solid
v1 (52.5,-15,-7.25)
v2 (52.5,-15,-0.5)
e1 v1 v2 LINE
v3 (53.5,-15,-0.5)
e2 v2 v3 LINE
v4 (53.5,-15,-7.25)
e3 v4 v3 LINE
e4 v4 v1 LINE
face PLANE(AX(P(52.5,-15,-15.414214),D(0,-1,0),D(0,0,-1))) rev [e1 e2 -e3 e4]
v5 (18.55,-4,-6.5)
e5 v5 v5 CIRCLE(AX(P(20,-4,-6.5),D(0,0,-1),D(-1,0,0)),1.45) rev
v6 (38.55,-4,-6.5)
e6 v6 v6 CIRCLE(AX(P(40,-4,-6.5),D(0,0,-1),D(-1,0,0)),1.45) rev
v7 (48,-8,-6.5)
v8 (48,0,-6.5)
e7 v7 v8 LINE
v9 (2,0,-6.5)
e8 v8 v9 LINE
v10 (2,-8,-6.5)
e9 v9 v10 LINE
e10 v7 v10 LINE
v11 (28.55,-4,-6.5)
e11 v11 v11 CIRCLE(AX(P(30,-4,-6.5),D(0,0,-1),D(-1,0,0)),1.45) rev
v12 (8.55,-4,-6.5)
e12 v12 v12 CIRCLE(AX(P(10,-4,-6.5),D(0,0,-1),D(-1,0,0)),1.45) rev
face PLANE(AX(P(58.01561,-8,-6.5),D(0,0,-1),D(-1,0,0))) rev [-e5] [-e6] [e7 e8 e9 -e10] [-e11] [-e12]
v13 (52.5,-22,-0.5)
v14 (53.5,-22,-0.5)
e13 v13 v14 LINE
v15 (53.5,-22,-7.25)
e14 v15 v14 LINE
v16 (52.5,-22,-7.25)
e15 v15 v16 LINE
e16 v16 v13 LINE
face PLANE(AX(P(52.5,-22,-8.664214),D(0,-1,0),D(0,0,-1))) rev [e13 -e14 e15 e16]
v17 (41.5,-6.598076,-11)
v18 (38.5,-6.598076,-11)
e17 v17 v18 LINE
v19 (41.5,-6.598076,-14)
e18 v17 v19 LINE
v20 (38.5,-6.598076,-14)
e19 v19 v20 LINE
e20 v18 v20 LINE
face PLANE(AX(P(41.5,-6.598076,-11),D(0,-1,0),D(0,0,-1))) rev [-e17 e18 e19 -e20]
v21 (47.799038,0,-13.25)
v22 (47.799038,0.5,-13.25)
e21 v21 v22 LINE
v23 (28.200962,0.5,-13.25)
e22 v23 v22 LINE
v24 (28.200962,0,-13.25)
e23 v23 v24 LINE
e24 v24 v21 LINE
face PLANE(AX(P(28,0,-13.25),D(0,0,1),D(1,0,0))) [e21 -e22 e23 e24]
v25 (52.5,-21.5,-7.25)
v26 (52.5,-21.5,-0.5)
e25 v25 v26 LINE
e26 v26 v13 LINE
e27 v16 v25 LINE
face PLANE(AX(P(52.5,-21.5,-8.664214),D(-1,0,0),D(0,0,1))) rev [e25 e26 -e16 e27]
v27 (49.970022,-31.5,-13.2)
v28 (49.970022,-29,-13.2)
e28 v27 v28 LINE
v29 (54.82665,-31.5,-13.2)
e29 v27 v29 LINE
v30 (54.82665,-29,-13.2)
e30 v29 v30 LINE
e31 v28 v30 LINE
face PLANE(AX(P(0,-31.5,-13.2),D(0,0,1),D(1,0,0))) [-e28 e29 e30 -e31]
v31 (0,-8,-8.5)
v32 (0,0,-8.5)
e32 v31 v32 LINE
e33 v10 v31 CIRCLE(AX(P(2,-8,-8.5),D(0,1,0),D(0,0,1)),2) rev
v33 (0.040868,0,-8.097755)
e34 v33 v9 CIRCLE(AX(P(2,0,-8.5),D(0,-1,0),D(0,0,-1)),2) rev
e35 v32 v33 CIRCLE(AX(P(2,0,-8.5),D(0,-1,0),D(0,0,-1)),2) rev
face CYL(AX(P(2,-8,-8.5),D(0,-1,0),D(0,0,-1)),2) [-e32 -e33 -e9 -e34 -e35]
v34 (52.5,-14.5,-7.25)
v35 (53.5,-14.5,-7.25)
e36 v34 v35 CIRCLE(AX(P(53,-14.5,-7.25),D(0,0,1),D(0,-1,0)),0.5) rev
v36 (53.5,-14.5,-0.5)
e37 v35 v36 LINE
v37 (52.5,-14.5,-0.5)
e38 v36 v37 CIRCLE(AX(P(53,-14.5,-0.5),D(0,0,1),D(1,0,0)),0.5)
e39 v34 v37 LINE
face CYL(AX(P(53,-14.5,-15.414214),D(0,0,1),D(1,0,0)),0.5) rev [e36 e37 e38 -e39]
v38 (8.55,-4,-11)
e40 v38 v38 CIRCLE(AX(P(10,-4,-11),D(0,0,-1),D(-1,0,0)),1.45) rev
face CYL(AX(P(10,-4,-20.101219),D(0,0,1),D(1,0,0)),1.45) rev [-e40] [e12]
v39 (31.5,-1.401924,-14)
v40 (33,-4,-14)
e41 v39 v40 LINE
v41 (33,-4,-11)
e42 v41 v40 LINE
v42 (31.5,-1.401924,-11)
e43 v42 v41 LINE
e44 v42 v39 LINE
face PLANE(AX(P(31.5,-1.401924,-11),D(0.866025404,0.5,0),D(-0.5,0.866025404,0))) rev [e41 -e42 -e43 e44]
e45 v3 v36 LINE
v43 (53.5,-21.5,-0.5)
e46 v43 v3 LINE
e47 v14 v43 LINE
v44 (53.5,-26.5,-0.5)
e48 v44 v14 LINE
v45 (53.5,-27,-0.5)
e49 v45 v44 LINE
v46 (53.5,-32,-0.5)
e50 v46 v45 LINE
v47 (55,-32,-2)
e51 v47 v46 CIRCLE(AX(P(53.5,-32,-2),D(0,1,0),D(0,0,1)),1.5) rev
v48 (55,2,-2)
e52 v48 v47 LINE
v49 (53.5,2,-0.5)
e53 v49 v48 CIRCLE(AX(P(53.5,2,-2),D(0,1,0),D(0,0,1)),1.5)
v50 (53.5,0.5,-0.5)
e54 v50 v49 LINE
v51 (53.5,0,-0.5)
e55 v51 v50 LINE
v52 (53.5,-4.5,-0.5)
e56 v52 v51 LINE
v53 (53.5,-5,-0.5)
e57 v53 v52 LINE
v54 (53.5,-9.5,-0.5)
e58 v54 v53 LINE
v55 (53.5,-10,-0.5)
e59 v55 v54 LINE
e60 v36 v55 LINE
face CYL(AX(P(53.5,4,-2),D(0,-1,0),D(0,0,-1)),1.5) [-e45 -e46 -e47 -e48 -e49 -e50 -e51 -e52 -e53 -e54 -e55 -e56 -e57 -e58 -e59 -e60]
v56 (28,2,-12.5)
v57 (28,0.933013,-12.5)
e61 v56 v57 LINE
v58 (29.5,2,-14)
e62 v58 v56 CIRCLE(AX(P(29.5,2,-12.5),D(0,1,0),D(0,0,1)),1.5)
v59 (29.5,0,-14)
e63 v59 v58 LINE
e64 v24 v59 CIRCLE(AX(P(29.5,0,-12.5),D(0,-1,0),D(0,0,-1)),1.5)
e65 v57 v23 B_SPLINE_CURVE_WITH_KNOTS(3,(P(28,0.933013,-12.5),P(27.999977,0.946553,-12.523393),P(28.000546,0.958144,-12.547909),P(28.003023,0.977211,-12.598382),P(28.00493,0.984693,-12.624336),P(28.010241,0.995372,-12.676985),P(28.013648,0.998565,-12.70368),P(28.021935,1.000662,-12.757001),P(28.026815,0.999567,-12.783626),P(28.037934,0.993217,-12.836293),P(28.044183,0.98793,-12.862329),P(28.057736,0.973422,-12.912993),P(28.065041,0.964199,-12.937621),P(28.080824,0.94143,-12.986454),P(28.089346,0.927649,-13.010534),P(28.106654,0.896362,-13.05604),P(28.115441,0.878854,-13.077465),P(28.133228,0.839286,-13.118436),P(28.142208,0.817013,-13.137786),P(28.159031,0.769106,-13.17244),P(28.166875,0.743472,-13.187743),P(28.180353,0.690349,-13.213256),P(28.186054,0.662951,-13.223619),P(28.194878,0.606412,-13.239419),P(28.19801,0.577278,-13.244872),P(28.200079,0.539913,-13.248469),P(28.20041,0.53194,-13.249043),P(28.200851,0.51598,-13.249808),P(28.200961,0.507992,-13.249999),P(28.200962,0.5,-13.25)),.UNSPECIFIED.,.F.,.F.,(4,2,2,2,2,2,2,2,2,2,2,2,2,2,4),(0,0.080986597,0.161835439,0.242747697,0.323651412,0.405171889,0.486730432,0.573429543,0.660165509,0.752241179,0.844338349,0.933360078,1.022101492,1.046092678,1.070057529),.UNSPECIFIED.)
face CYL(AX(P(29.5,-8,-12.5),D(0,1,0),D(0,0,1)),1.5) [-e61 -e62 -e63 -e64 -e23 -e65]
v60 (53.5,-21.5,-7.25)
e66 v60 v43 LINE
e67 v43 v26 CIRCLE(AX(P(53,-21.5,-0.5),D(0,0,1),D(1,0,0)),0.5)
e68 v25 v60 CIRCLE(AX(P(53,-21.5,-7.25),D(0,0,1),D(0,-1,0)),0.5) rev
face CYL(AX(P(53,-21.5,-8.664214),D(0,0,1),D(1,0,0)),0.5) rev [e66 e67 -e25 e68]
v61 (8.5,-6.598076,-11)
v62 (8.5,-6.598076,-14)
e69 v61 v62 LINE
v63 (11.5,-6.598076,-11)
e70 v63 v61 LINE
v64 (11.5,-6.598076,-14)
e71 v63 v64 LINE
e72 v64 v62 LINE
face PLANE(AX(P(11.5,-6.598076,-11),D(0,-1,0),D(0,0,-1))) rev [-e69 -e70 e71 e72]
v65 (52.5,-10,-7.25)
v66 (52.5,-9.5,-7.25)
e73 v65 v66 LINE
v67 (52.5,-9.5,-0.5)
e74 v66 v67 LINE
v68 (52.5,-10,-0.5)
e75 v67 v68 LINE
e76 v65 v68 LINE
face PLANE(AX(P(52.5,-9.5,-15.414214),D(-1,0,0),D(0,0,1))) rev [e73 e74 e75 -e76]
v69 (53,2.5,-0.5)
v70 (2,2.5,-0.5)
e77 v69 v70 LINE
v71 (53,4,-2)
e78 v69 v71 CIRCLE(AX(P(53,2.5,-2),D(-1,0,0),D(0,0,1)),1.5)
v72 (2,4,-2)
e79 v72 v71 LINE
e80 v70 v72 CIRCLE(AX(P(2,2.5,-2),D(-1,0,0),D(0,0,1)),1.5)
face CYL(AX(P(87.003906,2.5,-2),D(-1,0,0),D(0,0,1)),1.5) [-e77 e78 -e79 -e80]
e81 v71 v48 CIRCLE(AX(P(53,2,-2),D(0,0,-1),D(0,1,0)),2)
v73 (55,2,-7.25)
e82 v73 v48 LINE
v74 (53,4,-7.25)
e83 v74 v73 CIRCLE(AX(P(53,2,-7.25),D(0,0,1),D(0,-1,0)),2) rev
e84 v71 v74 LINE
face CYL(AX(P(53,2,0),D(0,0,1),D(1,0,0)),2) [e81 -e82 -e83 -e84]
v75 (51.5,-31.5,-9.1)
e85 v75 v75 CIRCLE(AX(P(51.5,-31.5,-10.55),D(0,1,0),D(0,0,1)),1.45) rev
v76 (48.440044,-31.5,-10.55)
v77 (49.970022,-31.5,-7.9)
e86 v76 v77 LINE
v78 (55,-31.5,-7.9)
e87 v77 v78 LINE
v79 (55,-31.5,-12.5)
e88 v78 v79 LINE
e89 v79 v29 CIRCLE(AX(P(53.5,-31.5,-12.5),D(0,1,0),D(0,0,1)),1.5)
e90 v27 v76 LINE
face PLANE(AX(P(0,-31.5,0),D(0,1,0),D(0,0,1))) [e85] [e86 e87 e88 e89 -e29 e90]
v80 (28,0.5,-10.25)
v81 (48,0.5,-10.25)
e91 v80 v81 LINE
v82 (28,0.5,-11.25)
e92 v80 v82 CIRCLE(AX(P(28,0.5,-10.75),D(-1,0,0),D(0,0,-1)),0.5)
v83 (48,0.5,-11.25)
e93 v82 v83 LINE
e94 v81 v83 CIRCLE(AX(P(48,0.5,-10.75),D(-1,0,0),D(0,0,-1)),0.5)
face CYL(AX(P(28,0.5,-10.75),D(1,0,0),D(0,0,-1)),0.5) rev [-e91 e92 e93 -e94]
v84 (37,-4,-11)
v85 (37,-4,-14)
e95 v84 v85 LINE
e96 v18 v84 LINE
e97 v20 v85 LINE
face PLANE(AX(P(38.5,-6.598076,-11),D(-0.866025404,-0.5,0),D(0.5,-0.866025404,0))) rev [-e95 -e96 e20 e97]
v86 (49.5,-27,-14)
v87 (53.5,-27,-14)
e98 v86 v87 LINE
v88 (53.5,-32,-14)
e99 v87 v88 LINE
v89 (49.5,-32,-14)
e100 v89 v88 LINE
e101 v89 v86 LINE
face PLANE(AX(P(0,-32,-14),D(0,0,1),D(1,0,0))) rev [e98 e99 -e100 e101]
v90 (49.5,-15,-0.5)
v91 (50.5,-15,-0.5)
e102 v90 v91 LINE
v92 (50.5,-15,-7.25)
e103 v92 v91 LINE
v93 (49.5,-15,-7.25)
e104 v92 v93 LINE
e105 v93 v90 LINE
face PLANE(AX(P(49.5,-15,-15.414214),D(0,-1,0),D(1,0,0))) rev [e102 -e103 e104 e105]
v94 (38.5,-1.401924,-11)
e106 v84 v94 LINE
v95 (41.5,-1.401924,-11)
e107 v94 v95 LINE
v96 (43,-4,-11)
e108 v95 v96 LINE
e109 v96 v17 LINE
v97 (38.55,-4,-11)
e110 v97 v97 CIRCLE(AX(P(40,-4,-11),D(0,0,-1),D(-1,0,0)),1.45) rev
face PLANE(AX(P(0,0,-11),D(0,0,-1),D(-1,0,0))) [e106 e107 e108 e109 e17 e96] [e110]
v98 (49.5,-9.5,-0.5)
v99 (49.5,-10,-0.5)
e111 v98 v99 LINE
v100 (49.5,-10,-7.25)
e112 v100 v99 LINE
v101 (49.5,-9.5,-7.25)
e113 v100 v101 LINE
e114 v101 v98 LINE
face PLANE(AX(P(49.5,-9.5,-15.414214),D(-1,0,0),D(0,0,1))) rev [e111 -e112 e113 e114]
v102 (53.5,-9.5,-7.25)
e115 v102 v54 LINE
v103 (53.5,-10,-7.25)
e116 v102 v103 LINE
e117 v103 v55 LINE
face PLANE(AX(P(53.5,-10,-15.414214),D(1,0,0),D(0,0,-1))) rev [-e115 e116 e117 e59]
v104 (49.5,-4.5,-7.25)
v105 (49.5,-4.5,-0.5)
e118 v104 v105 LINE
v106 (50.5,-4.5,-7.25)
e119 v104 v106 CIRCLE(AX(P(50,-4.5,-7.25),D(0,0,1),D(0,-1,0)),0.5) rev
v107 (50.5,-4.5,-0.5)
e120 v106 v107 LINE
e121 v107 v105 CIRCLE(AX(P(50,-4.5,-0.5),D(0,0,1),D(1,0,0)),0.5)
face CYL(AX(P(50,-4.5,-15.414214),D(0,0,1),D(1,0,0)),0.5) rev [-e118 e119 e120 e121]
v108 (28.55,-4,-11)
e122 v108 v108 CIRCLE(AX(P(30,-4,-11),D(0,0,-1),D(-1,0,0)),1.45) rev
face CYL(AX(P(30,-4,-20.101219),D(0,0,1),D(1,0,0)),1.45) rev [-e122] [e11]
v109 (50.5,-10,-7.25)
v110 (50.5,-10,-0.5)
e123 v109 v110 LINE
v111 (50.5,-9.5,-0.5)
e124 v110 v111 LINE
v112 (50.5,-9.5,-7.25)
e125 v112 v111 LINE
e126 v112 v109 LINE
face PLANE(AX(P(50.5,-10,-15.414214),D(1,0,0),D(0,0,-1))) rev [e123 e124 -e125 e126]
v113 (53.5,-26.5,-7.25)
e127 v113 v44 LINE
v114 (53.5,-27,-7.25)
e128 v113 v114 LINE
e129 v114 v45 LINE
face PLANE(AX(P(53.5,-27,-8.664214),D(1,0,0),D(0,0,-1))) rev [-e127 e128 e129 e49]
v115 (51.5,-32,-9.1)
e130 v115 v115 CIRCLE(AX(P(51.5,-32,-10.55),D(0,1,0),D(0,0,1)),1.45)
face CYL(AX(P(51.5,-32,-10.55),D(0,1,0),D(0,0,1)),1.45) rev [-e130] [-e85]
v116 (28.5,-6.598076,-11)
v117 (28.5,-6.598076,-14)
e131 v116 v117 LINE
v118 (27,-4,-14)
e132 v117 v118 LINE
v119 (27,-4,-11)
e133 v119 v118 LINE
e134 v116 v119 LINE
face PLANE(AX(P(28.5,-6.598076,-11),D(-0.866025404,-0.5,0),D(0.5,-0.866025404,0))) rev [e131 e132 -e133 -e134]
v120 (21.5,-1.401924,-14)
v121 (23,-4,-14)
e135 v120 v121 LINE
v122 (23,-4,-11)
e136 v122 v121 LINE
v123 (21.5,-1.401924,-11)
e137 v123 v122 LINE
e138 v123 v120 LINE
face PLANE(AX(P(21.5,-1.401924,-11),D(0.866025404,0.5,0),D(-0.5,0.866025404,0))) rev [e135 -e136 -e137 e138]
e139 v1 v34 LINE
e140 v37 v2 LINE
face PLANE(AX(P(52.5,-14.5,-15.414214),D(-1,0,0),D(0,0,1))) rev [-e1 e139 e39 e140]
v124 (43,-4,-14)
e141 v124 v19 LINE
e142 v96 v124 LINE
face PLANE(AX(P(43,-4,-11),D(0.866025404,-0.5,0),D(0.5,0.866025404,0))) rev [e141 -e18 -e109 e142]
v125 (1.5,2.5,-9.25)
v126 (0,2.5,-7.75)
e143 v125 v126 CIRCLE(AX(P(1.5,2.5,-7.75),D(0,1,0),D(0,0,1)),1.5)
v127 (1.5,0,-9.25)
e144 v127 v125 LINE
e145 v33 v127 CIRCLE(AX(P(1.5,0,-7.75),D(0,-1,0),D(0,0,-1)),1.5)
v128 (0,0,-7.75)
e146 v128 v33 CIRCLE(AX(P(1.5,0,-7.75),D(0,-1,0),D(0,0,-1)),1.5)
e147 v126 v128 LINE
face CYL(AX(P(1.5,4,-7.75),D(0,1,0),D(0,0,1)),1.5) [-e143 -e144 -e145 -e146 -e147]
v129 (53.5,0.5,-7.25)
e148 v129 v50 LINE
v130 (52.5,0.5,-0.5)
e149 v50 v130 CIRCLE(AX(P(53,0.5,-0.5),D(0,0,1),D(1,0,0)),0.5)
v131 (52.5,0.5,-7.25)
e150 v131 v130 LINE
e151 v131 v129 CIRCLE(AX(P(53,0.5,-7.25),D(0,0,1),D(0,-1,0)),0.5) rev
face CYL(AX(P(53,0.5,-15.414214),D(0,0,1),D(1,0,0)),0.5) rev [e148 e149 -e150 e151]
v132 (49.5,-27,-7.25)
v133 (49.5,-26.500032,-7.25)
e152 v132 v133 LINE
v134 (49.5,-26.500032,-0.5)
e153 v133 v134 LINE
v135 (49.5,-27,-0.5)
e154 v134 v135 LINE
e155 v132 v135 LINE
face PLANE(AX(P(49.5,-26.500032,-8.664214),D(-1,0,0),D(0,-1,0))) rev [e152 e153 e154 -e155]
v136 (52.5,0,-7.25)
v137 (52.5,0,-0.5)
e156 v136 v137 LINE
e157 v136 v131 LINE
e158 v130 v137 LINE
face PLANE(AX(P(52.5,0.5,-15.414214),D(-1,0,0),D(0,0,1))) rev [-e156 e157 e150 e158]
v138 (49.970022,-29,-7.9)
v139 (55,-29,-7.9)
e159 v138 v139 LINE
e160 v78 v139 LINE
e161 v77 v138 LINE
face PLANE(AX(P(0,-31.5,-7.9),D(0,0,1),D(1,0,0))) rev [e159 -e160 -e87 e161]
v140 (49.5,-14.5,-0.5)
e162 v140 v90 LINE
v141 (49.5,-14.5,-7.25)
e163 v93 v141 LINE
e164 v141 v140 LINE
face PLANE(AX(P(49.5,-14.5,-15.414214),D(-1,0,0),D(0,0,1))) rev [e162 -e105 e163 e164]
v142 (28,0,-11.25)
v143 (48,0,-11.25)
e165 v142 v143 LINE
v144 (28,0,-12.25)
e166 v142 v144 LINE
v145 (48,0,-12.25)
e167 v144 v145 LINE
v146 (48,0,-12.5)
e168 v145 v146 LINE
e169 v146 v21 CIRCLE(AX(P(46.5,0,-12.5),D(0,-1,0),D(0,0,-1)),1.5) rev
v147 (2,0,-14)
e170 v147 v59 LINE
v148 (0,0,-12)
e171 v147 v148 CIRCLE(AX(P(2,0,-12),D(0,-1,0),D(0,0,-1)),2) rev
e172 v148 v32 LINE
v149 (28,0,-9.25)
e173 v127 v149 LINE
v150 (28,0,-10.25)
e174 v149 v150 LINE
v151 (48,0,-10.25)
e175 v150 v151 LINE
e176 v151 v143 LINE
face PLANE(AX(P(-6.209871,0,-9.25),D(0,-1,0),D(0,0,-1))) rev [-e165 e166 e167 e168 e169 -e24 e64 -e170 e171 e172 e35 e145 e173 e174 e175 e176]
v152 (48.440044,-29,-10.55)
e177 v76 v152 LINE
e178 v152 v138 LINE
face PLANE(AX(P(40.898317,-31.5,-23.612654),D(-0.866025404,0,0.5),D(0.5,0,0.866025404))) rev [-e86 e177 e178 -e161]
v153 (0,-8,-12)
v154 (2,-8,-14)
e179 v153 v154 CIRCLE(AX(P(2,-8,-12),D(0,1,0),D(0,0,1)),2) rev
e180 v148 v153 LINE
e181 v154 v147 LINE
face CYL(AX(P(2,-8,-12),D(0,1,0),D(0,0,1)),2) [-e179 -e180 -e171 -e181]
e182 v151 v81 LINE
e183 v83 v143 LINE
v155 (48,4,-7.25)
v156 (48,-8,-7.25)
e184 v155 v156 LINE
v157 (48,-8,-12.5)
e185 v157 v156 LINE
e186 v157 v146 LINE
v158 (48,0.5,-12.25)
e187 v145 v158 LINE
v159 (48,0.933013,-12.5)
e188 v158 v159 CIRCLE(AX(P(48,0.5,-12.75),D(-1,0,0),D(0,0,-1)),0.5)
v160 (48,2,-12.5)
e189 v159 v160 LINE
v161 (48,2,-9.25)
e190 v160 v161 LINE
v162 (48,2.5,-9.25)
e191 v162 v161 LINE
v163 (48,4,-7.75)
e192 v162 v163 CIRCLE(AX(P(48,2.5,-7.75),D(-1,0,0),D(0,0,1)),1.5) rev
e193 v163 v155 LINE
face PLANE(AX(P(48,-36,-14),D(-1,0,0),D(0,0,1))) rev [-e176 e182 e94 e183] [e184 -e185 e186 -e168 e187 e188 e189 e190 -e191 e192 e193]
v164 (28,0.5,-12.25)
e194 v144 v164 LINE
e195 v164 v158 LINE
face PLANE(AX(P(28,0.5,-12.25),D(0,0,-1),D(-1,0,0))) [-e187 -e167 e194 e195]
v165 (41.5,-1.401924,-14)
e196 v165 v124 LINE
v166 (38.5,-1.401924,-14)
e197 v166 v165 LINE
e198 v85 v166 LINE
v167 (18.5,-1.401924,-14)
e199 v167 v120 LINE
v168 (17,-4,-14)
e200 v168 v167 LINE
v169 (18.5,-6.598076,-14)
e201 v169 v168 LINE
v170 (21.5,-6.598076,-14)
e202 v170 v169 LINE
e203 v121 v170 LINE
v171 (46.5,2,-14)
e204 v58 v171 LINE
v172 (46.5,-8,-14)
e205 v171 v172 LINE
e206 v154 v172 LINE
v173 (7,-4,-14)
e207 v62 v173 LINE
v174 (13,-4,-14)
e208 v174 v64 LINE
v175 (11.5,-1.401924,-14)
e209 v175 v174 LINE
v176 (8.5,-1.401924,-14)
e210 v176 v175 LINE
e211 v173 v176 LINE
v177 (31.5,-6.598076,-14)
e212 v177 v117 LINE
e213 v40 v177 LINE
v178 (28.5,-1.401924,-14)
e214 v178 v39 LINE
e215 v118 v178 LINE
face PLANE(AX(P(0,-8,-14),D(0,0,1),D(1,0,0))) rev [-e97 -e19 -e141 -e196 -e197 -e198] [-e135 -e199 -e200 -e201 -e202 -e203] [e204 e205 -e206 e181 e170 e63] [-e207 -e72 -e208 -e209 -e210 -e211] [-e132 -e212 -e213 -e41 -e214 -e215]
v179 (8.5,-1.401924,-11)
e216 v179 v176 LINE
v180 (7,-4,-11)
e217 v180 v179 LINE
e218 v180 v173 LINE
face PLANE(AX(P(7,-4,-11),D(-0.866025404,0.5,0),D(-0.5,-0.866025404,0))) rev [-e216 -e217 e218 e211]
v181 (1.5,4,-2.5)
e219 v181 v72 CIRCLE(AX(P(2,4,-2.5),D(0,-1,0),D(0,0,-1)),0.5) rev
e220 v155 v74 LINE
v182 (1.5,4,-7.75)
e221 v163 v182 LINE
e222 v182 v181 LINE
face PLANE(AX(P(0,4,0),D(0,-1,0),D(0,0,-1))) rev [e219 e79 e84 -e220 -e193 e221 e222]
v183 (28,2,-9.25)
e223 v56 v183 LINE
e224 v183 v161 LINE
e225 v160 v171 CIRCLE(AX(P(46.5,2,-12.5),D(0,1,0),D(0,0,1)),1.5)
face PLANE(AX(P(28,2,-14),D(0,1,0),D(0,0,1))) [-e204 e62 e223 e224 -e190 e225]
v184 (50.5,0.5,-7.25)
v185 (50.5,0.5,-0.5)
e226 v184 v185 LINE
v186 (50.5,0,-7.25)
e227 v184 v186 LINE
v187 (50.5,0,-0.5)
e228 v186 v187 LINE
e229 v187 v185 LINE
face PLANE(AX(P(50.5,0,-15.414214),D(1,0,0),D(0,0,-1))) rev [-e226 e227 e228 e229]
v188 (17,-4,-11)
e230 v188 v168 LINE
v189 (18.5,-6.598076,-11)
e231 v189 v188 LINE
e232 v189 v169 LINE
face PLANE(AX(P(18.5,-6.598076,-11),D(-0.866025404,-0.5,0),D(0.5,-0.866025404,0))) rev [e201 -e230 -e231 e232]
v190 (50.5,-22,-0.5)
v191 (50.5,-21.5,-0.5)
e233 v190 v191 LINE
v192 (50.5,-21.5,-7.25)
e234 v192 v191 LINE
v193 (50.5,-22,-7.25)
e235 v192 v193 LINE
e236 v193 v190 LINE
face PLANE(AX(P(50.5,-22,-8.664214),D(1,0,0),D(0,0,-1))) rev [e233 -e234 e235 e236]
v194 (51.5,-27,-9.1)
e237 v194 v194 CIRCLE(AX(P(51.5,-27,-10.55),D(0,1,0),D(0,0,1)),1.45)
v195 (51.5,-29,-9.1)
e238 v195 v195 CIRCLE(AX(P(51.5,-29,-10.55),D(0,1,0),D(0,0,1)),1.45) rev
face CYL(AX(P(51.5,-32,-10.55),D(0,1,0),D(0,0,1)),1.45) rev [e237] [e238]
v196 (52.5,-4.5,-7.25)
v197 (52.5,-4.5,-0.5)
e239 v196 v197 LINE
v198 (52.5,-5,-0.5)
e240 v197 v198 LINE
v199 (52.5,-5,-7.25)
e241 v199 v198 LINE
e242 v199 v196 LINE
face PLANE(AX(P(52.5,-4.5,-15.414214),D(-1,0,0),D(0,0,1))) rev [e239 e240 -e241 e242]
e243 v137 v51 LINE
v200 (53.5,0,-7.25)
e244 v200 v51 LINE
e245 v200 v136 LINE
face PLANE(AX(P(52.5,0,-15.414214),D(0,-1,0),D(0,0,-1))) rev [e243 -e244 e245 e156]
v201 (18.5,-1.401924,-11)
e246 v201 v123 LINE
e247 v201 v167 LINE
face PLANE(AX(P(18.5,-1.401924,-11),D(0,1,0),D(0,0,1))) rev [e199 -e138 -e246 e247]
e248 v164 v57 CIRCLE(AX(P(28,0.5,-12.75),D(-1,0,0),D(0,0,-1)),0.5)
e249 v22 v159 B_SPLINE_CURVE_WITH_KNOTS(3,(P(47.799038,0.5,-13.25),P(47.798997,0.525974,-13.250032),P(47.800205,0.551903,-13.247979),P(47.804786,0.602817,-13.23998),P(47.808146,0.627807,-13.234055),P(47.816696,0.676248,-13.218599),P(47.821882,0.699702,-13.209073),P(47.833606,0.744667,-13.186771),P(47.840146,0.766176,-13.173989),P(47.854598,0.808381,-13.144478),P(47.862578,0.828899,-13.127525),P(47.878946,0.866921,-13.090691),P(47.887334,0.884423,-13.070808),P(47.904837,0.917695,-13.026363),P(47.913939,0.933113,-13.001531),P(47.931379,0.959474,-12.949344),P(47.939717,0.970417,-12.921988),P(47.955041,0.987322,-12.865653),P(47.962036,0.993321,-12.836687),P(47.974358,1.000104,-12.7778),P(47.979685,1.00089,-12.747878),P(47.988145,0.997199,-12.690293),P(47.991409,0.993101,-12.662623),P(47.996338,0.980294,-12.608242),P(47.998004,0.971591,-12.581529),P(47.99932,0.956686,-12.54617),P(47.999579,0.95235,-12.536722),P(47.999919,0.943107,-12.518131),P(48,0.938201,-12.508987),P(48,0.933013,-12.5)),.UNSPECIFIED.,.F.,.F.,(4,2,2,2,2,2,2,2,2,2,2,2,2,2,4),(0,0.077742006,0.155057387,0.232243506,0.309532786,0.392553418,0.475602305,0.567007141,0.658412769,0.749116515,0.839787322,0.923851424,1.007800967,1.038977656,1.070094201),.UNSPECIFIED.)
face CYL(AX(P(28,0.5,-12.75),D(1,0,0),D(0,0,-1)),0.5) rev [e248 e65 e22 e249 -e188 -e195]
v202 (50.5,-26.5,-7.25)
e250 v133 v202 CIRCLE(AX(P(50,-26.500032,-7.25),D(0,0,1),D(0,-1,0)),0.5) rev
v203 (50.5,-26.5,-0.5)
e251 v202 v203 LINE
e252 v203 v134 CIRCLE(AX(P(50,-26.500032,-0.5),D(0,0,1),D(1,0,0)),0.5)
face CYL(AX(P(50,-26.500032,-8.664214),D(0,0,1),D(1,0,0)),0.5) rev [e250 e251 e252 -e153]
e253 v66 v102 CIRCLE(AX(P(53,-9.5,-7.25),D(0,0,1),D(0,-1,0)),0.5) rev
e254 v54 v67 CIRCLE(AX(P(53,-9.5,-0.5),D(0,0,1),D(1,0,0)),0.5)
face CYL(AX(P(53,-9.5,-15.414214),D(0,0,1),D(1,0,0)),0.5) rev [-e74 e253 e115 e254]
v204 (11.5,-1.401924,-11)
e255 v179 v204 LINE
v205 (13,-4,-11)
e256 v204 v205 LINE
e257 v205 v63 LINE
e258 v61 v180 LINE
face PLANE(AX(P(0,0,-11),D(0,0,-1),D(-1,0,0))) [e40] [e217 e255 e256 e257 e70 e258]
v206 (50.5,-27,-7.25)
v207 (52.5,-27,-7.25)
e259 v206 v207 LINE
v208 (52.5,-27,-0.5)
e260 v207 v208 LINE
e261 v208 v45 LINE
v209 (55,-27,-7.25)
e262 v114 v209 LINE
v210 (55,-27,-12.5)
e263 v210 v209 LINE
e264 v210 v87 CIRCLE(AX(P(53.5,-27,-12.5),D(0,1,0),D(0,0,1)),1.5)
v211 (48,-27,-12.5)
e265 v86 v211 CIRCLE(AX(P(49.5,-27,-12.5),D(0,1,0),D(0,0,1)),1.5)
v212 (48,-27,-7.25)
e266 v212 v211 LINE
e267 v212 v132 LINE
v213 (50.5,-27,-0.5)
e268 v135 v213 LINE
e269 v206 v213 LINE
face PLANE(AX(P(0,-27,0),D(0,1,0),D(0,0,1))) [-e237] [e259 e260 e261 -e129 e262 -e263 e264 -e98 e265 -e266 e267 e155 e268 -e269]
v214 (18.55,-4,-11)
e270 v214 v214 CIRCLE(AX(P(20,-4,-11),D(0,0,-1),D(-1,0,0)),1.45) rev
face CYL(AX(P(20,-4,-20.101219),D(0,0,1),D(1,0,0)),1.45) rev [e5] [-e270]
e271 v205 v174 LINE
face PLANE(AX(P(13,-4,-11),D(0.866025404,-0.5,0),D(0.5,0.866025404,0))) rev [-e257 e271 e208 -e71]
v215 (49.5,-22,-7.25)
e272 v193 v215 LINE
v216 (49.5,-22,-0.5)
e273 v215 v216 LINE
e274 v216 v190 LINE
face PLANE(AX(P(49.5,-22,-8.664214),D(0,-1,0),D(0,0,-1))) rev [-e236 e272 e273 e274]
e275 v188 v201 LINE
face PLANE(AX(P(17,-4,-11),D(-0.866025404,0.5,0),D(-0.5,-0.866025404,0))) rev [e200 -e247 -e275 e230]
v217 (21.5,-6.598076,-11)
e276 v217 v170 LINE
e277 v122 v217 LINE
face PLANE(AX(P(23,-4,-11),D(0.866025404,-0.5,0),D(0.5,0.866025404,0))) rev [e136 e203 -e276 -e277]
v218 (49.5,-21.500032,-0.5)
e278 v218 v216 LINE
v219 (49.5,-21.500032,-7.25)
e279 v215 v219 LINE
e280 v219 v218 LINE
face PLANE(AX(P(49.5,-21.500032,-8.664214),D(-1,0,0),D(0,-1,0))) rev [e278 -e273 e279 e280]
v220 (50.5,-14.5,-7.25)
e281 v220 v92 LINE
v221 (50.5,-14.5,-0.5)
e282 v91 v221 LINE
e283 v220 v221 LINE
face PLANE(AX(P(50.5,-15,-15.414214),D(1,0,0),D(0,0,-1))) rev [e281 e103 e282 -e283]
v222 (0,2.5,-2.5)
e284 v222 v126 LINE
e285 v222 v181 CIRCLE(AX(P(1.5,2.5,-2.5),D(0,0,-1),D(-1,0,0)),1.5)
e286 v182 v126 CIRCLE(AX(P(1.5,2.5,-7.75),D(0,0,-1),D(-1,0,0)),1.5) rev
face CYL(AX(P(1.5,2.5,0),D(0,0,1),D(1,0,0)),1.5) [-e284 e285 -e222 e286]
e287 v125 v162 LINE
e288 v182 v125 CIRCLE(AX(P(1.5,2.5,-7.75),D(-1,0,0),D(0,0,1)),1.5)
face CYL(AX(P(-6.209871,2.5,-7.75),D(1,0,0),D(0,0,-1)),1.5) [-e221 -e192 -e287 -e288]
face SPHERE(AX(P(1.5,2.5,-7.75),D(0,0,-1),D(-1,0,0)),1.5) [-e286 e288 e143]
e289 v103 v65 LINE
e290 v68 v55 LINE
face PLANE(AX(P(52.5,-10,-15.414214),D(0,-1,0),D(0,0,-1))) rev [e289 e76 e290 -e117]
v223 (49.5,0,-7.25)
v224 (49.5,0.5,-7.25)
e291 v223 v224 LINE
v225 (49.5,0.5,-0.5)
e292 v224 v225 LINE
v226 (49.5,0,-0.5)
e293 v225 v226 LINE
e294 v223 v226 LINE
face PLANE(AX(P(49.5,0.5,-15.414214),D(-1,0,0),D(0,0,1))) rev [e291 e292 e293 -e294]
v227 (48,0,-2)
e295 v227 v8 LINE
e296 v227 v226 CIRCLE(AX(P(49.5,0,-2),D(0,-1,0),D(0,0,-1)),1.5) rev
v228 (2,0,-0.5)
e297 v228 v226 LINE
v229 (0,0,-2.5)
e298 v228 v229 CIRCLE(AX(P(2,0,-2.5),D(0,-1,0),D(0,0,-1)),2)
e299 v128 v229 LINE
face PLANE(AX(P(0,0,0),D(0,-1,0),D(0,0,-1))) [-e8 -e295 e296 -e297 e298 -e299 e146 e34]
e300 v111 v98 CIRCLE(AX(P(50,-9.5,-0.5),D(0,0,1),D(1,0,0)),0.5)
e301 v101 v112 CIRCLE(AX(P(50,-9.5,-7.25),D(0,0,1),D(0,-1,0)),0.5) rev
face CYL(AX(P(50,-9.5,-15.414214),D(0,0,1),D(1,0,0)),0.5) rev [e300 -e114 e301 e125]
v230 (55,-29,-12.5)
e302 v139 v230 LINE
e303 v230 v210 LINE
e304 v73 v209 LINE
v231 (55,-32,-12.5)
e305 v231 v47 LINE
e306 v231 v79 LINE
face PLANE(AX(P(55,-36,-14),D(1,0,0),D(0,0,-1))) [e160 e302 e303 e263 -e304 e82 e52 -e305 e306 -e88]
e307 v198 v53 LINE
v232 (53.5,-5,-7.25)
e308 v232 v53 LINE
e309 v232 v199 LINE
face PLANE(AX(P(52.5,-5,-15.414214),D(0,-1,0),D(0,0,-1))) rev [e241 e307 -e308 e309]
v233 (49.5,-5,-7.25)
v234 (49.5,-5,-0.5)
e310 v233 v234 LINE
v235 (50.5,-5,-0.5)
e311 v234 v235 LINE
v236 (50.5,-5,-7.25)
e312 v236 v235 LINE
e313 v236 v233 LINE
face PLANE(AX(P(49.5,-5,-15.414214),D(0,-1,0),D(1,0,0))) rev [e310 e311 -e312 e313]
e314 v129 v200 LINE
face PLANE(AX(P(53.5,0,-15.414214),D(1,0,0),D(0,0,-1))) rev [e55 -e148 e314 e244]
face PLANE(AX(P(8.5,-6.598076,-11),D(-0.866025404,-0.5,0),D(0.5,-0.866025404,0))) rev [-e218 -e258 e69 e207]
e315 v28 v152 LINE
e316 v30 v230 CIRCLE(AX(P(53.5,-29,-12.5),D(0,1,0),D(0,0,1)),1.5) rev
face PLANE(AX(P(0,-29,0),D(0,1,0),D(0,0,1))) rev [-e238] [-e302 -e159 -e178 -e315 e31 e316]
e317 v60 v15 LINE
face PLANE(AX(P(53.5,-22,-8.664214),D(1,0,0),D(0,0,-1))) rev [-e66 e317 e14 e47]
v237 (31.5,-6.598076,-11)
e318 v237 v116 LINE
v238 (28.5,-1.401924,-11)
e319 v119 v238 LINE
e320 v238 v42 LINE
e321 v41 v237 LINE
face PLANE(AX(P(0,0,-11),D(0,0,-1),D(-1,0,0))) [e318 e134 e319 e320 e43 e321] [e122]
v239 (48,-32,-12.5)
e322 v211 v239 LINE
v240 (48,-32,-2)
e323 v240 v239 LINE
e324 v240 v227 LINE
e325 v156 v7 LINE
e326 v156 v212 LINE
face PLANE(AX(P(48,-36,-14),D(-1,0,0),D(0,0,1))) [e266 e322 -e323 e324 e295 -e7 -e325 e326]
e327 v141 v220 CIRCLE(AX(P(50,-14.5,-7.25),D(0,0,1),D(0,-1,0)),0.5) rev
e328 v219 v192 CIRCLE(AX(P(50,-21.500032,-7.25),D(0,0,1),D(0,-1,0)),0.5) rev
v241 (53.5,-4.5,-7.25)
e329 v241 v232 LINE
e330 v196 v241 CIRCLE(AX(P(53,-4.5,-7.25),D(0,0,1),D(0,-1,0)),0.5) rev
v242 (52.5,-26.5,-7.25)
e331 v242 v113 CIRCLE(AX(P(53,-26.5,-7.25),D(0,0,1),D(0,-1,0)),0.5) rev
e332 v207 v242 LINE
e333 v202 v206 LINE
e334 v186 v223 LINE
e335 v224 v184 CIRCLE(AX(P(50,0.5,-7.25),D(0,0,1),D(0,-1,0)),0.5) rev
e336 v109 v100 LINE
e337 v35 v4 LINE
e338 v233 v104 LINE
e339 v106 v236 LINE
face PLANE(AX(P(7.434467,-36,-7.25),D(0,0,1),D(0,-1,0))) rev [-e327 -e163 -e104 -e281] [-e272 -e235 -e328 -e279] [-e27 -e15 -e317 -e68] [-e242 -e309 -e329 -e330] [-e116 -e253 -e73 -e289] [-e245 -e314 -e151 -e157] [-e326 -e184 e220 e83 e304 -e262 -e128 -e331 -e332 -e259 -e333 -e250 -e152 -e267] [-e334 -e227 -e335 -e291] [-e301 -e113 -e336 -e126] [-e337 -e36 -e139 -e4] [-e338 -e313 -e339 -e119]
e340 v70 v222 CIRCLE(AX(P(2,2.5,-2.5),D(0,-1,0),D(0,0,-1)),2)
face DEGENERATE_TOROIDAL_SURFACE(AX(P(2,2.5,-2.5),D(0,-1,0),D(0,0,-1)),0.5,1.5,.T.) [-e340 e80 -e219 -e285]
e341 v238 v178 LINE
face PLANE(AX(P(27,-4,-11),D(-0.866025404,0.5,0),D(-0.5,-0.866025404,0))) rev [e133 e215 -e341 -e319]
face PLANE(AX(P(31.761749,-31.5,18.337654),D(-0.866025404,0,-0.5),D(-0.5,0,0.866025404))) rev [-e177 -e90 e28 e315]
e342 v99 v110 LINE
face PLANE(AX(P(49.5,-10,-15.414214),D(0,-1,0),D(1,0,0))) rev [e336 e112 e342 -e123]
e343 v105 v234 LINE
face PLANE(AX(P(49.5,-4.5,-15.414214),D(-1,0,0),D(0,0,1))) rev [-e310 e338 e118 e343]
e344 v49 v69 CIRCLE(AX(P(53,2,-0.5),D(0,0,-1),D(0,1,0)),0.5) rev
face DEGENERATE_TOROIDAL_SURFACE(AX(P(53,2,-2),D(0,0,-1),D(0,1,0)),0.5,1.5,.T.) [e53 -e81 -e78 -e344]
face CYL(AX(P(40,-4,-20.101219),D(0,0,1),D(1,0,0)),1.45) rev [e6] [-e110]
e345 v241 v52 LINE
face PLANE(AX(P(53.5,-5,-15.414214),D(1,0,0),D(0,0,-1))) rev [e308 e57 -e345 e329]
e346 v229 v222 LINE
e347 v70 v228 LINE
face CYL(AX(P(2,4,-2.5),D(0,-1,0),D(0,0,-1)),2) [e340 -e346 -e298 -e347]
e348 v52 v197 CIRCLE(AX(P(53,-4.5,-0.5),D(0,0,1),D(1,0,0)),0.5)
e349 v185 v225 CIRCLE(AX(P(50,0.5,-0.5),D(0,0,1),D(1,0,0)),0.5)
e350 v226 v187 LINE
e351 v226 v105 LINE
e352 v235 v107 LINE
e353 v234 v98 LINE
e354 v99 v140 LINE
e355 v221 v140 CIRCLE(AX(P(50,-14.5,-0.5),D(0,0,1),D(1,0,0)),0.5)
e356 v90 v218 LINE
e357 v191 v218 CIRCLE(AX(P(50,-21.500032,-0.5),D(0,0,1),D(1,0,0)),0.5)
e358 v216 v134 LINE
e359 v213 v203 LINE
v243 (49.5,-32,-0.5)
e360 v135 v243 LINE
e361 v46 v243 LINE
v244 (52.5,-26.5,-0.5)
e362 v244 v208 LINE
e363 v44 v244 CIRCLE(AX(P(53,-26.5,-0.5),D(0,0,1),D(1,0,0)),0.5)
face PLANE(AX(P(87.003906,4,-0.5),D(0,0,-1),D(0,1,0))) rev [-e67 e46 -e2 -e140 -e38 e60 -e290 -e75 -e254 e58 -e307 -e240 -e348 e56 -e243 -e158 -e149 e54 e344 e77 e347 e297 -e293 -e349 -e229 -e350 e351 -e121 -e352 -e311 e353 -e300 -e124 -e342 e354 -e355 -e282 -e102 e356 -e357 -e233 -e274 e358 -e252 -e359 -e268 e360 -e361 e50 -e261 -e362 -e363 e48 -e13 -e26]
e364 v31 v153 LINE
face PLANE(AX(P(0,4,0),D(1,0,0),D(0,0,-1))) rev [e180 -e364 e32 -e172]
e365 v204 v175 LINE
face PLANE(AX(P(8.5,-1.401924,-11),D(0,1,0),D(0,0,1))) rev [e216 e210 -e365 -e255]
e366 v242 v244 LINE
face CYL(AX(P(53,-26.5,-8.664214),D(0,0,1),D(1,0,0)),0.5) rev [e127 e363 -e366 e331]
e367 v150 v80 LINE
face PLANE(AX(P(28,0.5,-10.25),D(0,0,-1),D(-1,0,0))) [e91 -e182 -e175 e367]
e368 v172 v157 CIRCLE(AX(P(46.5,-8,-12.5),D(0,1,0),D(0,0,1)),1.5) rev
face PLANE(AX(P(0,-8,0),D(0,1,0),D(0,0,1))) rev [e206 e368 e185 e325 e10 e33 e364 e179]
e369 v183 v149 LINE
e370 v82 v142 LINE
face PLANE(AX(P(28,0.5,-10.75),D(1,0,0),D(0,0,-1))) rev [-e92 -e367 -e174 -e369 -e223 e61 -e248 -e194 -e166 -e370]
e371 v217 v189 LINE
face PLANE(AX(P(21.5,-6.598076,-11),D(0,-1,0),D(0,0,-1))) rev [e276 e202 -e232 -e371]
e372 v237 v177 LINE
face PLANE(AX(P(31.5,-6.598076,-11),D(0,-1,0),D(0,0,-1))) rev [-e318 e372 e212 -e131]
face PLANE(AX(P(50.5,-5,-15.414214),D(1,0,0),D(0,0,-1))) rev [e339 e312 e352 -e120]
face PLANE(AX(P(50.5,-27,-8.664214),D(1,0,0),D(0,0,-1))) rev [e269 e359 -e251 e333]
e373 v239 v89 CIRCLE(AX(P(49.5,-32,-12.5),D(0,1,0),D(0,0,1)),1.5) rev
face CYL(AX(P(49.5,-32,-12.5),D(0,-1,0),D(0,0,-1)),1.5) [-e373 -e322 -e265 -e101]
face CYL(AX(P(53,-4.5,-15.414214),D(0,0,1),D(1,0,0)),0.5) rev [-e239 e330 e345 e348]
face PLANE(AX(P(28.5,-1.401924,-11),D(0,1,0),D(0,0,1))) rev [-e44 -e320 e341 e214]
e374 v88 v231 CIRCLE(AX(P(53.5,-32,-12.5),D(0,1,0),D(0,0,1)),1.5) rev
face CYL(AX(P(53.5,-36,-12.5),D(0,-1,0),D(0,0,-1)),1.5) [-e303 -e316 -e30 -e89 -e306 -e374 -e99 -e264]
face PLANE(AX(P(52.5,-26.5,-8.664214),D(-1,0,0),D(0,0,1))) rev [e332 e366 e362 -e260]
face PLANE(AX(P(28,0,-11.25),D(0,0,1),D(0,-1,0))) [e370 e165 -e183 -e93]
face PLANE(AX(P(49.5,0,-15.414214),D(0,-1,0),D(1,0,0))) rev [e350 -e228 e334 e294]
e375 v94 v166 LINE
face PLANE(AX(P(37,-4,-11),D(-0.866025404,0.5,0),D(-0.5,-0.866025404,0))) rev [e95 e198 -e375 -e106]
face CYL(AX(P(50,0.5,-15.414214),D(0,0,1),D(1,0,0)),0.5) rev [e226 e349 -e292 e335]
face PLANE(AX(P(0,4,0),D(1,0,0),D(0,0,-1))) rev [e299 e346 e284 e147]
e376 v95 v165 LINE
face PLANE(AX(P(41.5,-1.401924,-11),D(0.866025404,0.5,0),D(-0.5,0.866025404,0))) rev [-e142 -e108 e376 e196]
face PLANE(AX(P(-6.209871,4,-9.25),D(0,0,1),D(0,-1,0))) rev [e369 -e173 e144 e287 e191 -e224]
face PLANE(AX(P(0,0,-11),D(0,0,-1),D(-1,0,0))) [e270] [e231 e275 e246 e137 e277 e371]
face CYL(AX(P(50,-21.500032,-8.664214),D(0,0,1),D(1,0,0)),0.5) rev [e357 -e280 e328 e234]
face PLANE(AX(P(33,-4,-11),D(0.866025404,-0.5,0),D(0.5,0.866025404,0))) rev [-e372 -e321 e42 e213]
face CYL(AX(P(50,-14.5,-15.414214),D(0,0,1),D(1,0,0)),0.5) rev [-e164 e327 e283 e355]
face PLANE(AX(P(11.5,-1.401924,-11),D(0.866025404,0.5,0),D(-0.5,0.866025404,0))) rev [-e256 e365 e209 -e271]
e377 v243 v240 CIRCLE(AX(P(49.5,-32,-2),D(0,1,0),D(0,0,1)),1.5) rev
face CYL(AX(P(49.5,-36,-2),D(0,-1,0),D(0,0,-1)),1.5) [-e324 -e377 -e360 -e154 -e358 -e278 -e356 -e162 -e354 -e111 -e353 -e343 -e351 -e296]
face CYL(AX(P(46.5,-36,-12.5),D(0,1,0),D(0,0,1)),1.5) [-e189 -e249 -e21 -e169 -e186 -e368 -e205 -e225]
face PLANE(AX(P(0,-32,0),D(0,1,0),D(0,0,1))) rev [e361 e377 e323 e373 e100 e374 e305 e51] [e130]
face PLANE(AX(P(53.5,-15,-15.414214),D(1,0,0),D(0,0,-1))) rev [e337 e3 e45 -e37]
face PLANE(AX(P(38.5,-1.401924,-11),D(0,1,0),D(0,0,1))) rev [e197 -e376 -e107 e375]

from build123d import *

# Parameters (mm, degrees)
SKETCH1_W            = 55
SKETCH1_H            = 16
BOSS_EXTRUDE1_DEPTH  = 4
SKETCH2_W            = 50
SKETCH2_H            = 8
BOSS_EXTRUDE2_DEPTH  = 8
SKETCH3_W            = 5
SKETCH3_H            = 16
BOSS_EXTRUDE3_DEPTH  = 28
SKETCH4_R            = 1.45
CUT_EXTRUDE2_DEPTH   = 10
CUT_EXTRUDE4_START   = -3
CUT_EXTRUDE4_DEPTH   = 3
CUT_EXTRUDE5_DEPTH   = 5
SKETCH8_W            = 50
SKETCH8_H            = 2
CUT_EXTRUDE6_DEPTH   = 4
CUT_EXTRUDE7_START   = -50
SKETCH9_W            = 0.5
SKETCH9_H            = 8
CUT_EXTRUDE7_DEPTH   = 50
CUT_EXTRUDE8_START   = -55
SKETCH10_W           = 0.5
SKETCH10_H           = 32
CUT_EXTRUDE8_DEPTH   = 55
CUT_EXTRUDE9_DEPTH   = 3
CUT_EXTRUDE11_DEPTH  = 3
BOSS_EXTRUDE4_START  = 2
SKETCH17_W           = 15
SKETCH17_H           = 32
BOSS_EXTRUDE4_DEPTH  = 2
SKETCH18_W           = 7
SKETCH18_H           = 1.5
CUT_EXTRUDE12_DEPTH  = 32
FILLET1_R            = 2
SKETCH19_W           = 13.5
SKETCH19_H           = 32
CUT_EXTRUDE13_DEPTH  = 7
SKETCH20_W           = 7
SKETCH20_H           = 13.5
BOSS_EXTRUDE5_DEPTH  = 40
CUT_EXTRUDE14_DEPTH  = 13.5
FILLET2_R            = 2
CUT_EXTRUDE15_REACH  = 69.209
SKETCH22_W           = 6.75
SKETCH22_H           = 40
LPATTERN1_COUNT      = 4
LPATTERN1_PITCH      = 5
SKETCH23_W           = 4.75
SKETCH23_H           = 4
CUT_EXTRUDE16_DEPTH  = 48
BOSS_EXTRUDE9_START  = -27
SKETCH29_W           = 7
SKETCH29_H           = 6.75
SKETCH29_R           = 1.45
BOSS_EXTRUDE9_DEPTH  = 5
CUT_EXTRUDE19_START  = -2
CUT_EXTRUDE19_DEPTH  = 2.5
BOSS_EXTRUDE11_DEPTH = 20
SKETCH35_W           = 7
SKETCH35_H           = 4
CUT_EXTRUDE20_DEPTH  = 6.75
FILLET3_R            = 1.5
CUT_EXTRUDE21_DEPTH  = 6.75


# Read off the part's stored shape, not the designer's step: Cut-Extrude4
with BuildPart() as part:
    # Sketch1 → Boss-Extrude1 (new body)
    with BuildSketch(Plane(origin=(0, 0, 0), x_dir=(1, 0, 0), z_dir=(0, 1, 0))):
        with Locations((27.5, 8)):
            Rectangle(SKETCH1_W, SKETCH1_H)
    extrude(amount=BOSS_EXTRUDE1_DEPTH)

    # Sketch2 → Boss-Extrude2 (add)
    with BuildSketch(Plane.XZ):
        with Locations((25, -10)):
            Rectangle(SKETCH2_W, SKETCH2_H)
    extrude(amount=BOSS_EXTRUDE2_DEPTH)

    # Sketch3 → Boss-Extrude3 (add)
    with BuildSketch(Plane.XZ):
        with Locations((52.5, -8)):
            Rectangle(SKETCH3_W, SKETCH3_H)
    extrude(amount=BOSS_EXTRUDE3_DEPTH)

    # Sketch4 → Cut-Extrude2 (cut)
    with BuildSketch(Plane.XY.offset(-6)):
        with Locations((10, -4)):
            Circle(SKETCH4_R)
        with Locations((20, -4)):
            Circle(SKETCH4_R)
        with Locations((30, -4)):
            Circle(SKETCH4_R)
        with Locations((40, -4)):
            Circle(SKETCH4_R)
    extrude(amount=-CUT_EXTRUDE2_DEPTH, mode=Mode.SUBTRACT)

    # Cut-Extrude4 outline → Cut-Extrude4 (cut)
    with BuildSketch(Plane.ZY.offset(-50).offset(CUT_EXTRUDE4_START)):
        Polygon((-6.598076211, -25.5), (-4, -27), (-1.401923789, -25.5), (-1.401923789, 0), (-6, 0), (-6, -8), (-6.598076211, -8), align=None)
        Polygon((-7.401923789, -25.5), (-7.401923789, -8), (-12.598076211, -8), (-12.598076211, -25.5), (-10, -27), align=None)
    extrude(amount=CUT_EXTRUDE4_DEPTH, mode=Mode.SUBTRACT)

    # Sketch7 → Cut-Extrude5 (cut)
    with BuildSketch(Plane.ZY.offset(-50)):
        with BuildLine():
            Line((-11.45, -12), (-11.45, -24))
            ThreePointArc((-11.45, -24), (-10, -25.45), (-8.55, -24))
            Line((-8.55, -24), (-8.55, -12))
            ThreePointArc((-8.55, -12), (-10, -10.55), (-11.45, -12))
        make_face()
        with BuildLine():
            Line((-2.55, -12), (-2.55, -24))
            ThreePointArc((-2.55, -24), (-4, -25.45), (-5.45, -24))
            Line((-5.45, -24), (-5.45, -12))
            ThreePointArc((-5.45, -12), (-4, -10.55), (-2.55, -12))
        make_face()
    extrude(amount=-CUT_EXTRUDE5_DEPTH, mode=Mode.SUBTRACT)

    # Sketch8 → Cut-Extrude6 (cut)
    with BuildSketch(Plane(origin=(0, 4, 0), x_dir=(1, 0, 0), z_dir=(0, 1, 0))):
        with Locations((25, 15)):
            Rectangle(SKETCH8_W, SKETCH8_H)
    extrude(amount=-CUT_EXTRUDE6_DEPTH, mode=Mode.SUBTRACT)

    # Sketch9 → Cut-Extrude7 (cut)
    with BuildSketch(Plane.ZY.offset(CUT_EXTRUDE7_START)):
        with Locations((-6.25, -4)):
            Rectangle(SKETCH9_W, SKETCH9_H)
    extrude(amount=CUT_EXTRUDE7_DEPTH, mode=Mode.SUBTRACT)

    # Sketch10 → Cut-Extrude8 (cut)
    with BuildSketch(Plane.ZY.offset(CUT_EXTRUDE8_START)):
        with Locations((-0.25, -12)):
            Rectangle(SKETCH10_W, SKETCH10_H)
        with Locations((-15.75, -12)):
            Rectangle(SKETCH10_W, SKETCH10_H)
    extrude(amount=CUT_EXTRUDE8_DEPTH, mode=Mode.SUBTRACT)

    # Sketch11 → Cut-Extrude9 (cut)
    with BuildSketch(Plane(origin=(0, 0, -14), x_dir=(-1, 0, 0), z_dir=(0, 0, -1))):
        Polygon((-37, -4), (-38.5, -1.401923789), (-41.5, -1.401923789), (-43, -4), (-41.5, -6.598076211), (-38.5, -6.598076211), align=None)
        Polygon((-27, -4), (-28.5, -1.401923789), (-31.5, -1.401923789), (-33, -4), (-31.5, -6.598076211), (-28.5, -6.598076211), align=None)
        Polygon((-17, -4), (-18.5, -1.401923789), (-21.5, -1.401923789), (-23, -4), (-21.5, -6.598076211), (-18.5, -6.598076211), align=None)
        Polygon((-7, -4), (-8.5, -1.401923789), (-11.5, -1.401923789), (-13, -4), (-11.5, -6.598076211), (-8.5, -6.598076211), align=None)
    extrude(amount=-CUT_EXTRUDE9_DEPTH, mode=Mode.SUBTRACT)

    # Sketch15 → Cut-Extrude11 (cut)
    with BuildSketch(Plane.ZY.offset(-50)):
        Polygon((-4, -27), (-1.401923789, -25.5), (-1.401923789, 0.004821093), (-1.401923789, 4), (-6.598076211, 4), (-6.598076211, -8), (-6.598076211, -25.5), align=None)
        Polygon((-7.401923789, -25.5), (-7.401923789, -8), (-7.401923789, 4), (-12.598076211, 4), (-12.598076211, -8), (-12.598076211, -25.5), (-10, -27), align=None)
    extrude(amount=-CUT_EXTRUDE11_DEPTH, mode=Mode.SUBTRACT)

    # Sketch17 → Boss-Extrude4 (add)
    with BuildSketch(Plane.ZY.offset(-50).offset(BOSS_EXTRUDE4_START)):
        with Locations((-8, -12)):
            Rectangle(SKETCH17_W, SKETCH17_H)
        with BuildLine():
            Line((-11.45, -12), (-11.45, -24))
            ThreePointArc((-11.45, -24), (-10, -25.45), (-8.55, -24))
            Line((-8.55, -24), (-8.55, -12))
            ThreePointArc((-8.55, -12), (-10, -10.55), (-11.45, -12))
        make_face(mode=Mode.SUBTRACT)
        with BuildLine():
            Line((-5.45, -12), (-5.45, -24))
            ThreePointArc((-5.45, -24), (-4, -25.45), (-2.55, -24))
            Line((-2.55, -24), (-2.55, -12))
            ThreePointArc((-2.55, -12), (-4, -10.55), (-5.45, -12))
        make_face(mode=Mode.SUBTRACT)
    extrude(amount=-BOSS_EXTRUDE4_DEPTH)

    # Sketch18 → Cut-Extrude12 (cut)
    with BuildSketch(Plane(origin=(0, 4, 0), x_dir=(1, 0, 0), z_dir=(0, 1, 0))):
        with Locations((51.5, 14.75)):
            Rectangle(SKETCH18_W, SKETCH18_H)
    extrude(amount=-CUT_EXTRUDE12_DEPTH, mode=Mode.SUBTRACT)

    # Fillet1
    fillet1_edges = [part.edges().sort_by_distance(p)[0] for p in [
        (0, -2, -14),
        (0, -4, -6.5),
        (0, 2, -0.5),
        (55, -12, -0.5),
        (48, -14, -0.5),
        (55, -12, -14),
        (48, -18, -14),
    ]]
    fillet(fillet1_edges, radius=FILLET1_R)

    # Sketch19 → Cut-Extrude13 (cut)
    with BuildSketch(Plane(origin=(55, 0, 0), x_dir=(0, 0, -1), z_dir=(1, 0, 0))):
        with Locations((7.25, -12)):
            Rectangle(SKETCH19_W, SKETCH19_H)
    extrude(amount=-CUT_EXTRUDE13_DEPTH, mode=Mode.SUBTRACT)

    # Sketch20 → Boss-Extrude5 (add)
    with BuildSketch(Plane(origin=(0, 4, 0), x_dir=(1, 0, 0), z_dir=(0, 1, 0))):
        with Locations((51.5, 7.25)):
            Rectangle(SKETCH20_W, SKETCH20_H)
    extrude(amount=-BOSS_EXTRUDE5_DEPTH)

    # Sketch21 → Cut-Extrude14 (cut)
    with BuildSketch(Plane.XY.offset(-0.5)):
        with BuildLine():
            Line((52.5, 0.5), (52.5, 0))
            Line((52.5, 0), (53.5, 0))
            Line((53.5, 0), (53.5, 0.5))
            ThreePointArc((53.5, 0.5), (53.353553391, 0.853553391), (53, 1))
            ThreePointArc((53, 1), (52.646446609, 0.853553391), (52.5, 0.5))
        make_face()
        with BuildLine():
            Line((49.5, 0.5), (49.5, 0))
            Line((49.5, 0), (50.5, 0))
            Line((50.5, 0), (50.5, 0.5))
            ThreePointArc((50.5, 0.5), (50, 1), (49.5, 0.5))
        make_face()
    cut_extrude14 = extrude(amount=-CUT_EXTRUDE14_DEPTH, mode=Mode.SUBTRACT)

    # Fillet2
    fillet2_edges = [part.edges().sort_by_distance(p)[0] for p in [
        (48, -36, -7.25),
        (55, -36, -7.25),
        (55, 4, -7.25),
    ]]
    fillet(fillet2_edges, radius=FILLET2_R)

    # Cut-Extrude15: up to this face of the body (flat: up to its plane)
    cut_extrude15_end = Plane(part.part.faces().sort_by_distance((48, -18.954887218, -6.79887218))[0])
    # Sketch22 → Cut-Extrude15 (cut, up to the picked face)
    with BuildSketch(Plane(origin=(55, 0, 0), x_dir=(0, 0, -1), z_dir=(1, 0, 0)), mode=Mode.PRIVATE) as cut_extrude15_sk1:
        with Locations((10.625, -16)):
            Rectangle(SKETCH22_W, SKETCH22_H)
    cut_extrude15_tool1 = split(extrude(cut_extrude15_sk1.sketch, amount=-CUT_EXTRUDE15_REACH, mode=Mode.PRIVATE), bisect_by=cut_extrude15_end, keep=Keep.BOTH, mode=Mode.PRIVATE)
    add(cut_extrude15_tool1.solids().sort_by(Axis((55, -16, -10.625), (-1, 0, 0)))[0], mode=Mode.SUBTRACT)

    # LPattern1: Cut-Extrude14 ×4
    with Locations(*[(0, -i * LPATTERN1_PITCH, 0) for i in range(1, LPATTERN1_COUNT)]):
        add(cut_extrude14, mode=Mode.SUBTRACT)

    # Sketch23 → Cut-Extrude16 (cut)
    with BuildSketch(Plane(origin=(48, 0, 0), x_dir=(0, 0, -1), z_dir=(1, 0, 0))):
        with Locations((11.625, 2)):
            Rectangle(SKETCH23_W, SKETCH23_H)
    extrude(amount=-CUT_EXTRUDE16_DEPTH, mode=Mode.SUBTRACT)

    # Sketch29 → Boss-Extrude9 (add)
    with BuildSketch(Plane(origin=(0, 0, 0), x_dir=(1, 0, 0), z_dir=(0, 1, 0)).offset(BOSS_EXTRUDE9_START)):
        with Locations((51.5, 10.625)):
            Rectangle(SKETCH29_W, SKETCH29_H)
        with Locations(Location((51.5, 10.55, 0), (0, 0, 270))):
            Circle(SKETCH29_R, mode=Mode.SUBTRACT)
    extrude(amount=-BOSS_EXTRUDE9_DEPTH)

    # Sketch30 → Cut-Extrude19 (cut)
    with BuildSketch(Plane(origin=(0, -27, 0), x_dir=(1, 0, 0), z_dir=(0, 1, 0)).offset(CUT_EXTRUDE19_START)):
        Polygon((53.029978213, 13.2), (49.970021787, 13.2), (48.440043573, 10.55), (49.970021787, 7.9), (53.029978213, 7.9), (55, 7.9), (55, 13.2), align=None)
    extrude(amount=-CUT_EXTRUDE19_DEPTH, mode=Mode.SUBTRACT)

    # Sketch34 → Boss-Extrude11 (add)
    with BuildSketch(Plane(origin=(48, 0, 0), x_dir=(0, 0, -1), z_dir=(1, 0, 0))):
        with BuildLine():
            Line((14, 0), (13.25, 0))
            Line((13.25, 0), (13.25, 0.5))
            ThreePointArc((13.25, 0.5), (12.75, 1), (12.25, 0.5))
            Line((12.25, 0.5), (12.25, 0))
            Line((12.25, 0), (11.25, 0))
            Line((11.25, 0), (11.25, 0.5))
            ThreePointArc((11.25, 0.5), (10.75, 1), (10.25, 0.5))
            Line((10.25, 0.5), (10.25, 0))
            Line((10.25, 0), (9.25, 0))
            Line((9.25, 0), (9.25, 2))
            Line((9.25, 2), (14, 2))
            Line((14, 2), (14, 0))
        make_face()
    extrude(amount=-BOSS_EXTRUDE11_DEPTH)

    # Sketch35 → Cut-Extrude20 (cut)
    with BuildSketch(Plane.XY.offset(-0.5)):
        with Locations((51.5, -34)):
            Rectangle(SKETCH35_W, SKETCH35_H)
    extrude(amount=-CUT_EXTRUDE20_DEPTH, mode=Mode.SUBTRACT)

    # Fillet3
    # the kernel refuses this fillet: 1.5 mm, written as the material it takes off along each edge
    with BuildSketch(Plane(origin=(1.5, 2.5, -7.75), x_dir=(-1, 0, 0), z_dir=(0, 1, 0))) as fillet3_piece_1_section:
        Polygon((0, 0), (FILLET3_R, 0), (FILLET3_R, -FILLET3_R), (0, -FILLET3_R), align=None)
    fillet3_piece_1 = extrude(amount=FILLET3_R, mode=Mode.PRIVATE)
    fillet3_piece_1 = fillet3_piece_1 - Plane(origin=(1.5, 2.5, -7.75), x_dir=(0.7071067811865475, 0, 0.7071067811865475), z_dir=(0, 1, 0)) * Sphere(FILLET3_R, mode=Mode.PRIVATE)
    add(fillet3_piece_1, mode=Mode.SUBTRACT)
    with BuildSketch(Plane(origin=(0, 4, -7.75), x_dir=(1, 0, 0), z_dir=(0, 0, 1))) as fillet3_piece_2:
        with BuildLine():
            CenterArc((FILLET3_R, -FILLET3_R), FILLET3_R, 90, 90)
            Line((0, -FILLET3_R), (0, 0))
            Line((0, 0), (FILLET3_R, 0))
        make_face()
    extrude(amount=5.25, mode=Mode.SUBTRACT)
    with BuildSketch(Plane(origin=(2, 4, -2.5), x_dir=(-1, 0, 0), z_dir=(0, 0, -1))) as fillet3_piece_3:
        with BuildLine():
            CenterArc((2 - FILLET3_R, -FILLET3_R), FILLET3_R, 0, 90)
            Line((2, -FILLET3_R), (2, 0))
            Line((2, 0), (2 - FILLET3_R, 0))
        make_face()
    revolve(axis=Axis((2, 4, -2.5), (0, 1, 0)), revolution_arc=90, mode=Mode.SUBTRACT)
    with BuildSketch(Plane(origin=(2, 4, -0.5), x_dir=(0, 0, -1), z_dir=(1, 0, 0))) as fillet3_piece_4:
        with BuildLine():
            CenterArc((FILLET3_R, -FILLET3_R), FILLET3_R, 90, 90)
            Line((0, -FILLET3_R), (0, 0))
            Line((0, 0), (FILLET3_R, 0))
        make_face()
    extrude(amount=51, mode=Mode.SUBTRACT)
    with BuildSketch(Plane(origin=(53, 2, -0.5), x_dir=(0, 1, 0), z_dir=(-1, 0, 0))) as fillet3_piece_5:
        with BuildLine():
            CenterArc((2 - FILLET3_R, FILLET3_R), FILLET3_R, 270, 90)
            Line((2 - FILLET3_R, 0), (2, 0))
            Line((2, 0), (2, FILLET3_R))
        make_face()
    revolve(axis=Axis((53, 2, -0.5), (0, 0, -1)), revolution_arc=90, mode=Mode.SUBTRACT)
    with BuildSketch(Plane(origin=(28, 5.75, -14), x_dir=(1, 0, 0), z_dir=(0, -1, 0))) as fillet3_piece_6:
        with BuildLine():
            CenterArc((FILLET3_R, FILLET3_R), FILLET3_R, 180, 90)
            Line((0, FILLET3_R), (0, 0))
            Line((0, 0), (FILLET3_R, 0))
        make_face()
    extrude(amount=5.75, mode=Mode.SUBTRACT)
    with BuildSketch(Plane(origin=(48, -11.75, -14), x_dir=(-1, 0, 0), z_dir=(0, 1, 0))) as fillet3_piece_7:
        with BuildLine():
            CenterArc((FILLET3_R, FILLET3_R), FILLET3_R, 180, 90)
            Line((0, FILLET3_R), (0, 0))
            Line((0, 0), (FILLET3_R, 0))
        make_face()
    extrude(amount=17.5, mode=Mode.SUBTRACT)
    with BuildSketch(Plane(origin=(48, -23.25, -14), x_dir=(0, 0, 1), z_dir=(0, -1, 0))) as fillet3_piece_8:
        with BuildLine():
            CenterArc((FILLET3_R, -FILLET3_R), FILLET3_R, 90, 90)
            Line((0, -FILLET3_R), (0, 0))
            Line((0, 0), (FILLET3_R, 0))
        make_face()
    extrude(amount=12.5, mode=Mode.SUBTRACT)
    with BuildSketch(Plane(origin=(55, -23.25, -14), x_dir=(0, 0, 1), z_dir=(0, -1, 0))) as fillet3_piece_9:
        with BuildLine():
            CenterArc((FILLET3_R, FILLET3_R), FILLET3_R, 180, 90)
            Line((0, FILLET3_R), (0, 0))
            Line((0, 0), (FILLET3_R, 0))
        make_face()
    extrude(amount=12.5, mode=Mode.SUBTRACT)
    with BuildSketch(Plane(origin=(55, 2, -0.5), x_dir=(0, 0, -1), z_dir=(0, -1, 0))) as fillet3_piece_10:
        with BuildLine():
            CenterArc((FILLET3_R, -FILLET3_R), FILLET3_R, 90, 90)
            Line((0, -FILLET3_R), (0, 0))
            Line((0, 0), (FILLET3_R, 0))
        make_face()
    extrude(amount=37.75, mode=Mode.SUBTRACT)
    with BuildSketch(Plane(origin=(51.75, 4, -9.25), x_dir=(0, 0, 1), z_dir=(-1, 0, 0))) as fillet3_piece_11:
        with BuildLine():
            CenterArc((FILLET3_R, -FILLET3_R), FILLET3_R, 90, 90)
            Line((0, -FILLET3_R), (0, 0))
            Line((0, 0), (FILLET3_R, 0))
        make_face()
    extrude(amount=50.25, mode=Mode.SUBTRACT)
    with BuildSketch(Plane(origin=(0, 0, -9.25), x_dir=(1, 0, 0), z_dir=(0, 1, 0))) as fillet3_piece_12:
        with BuildLine():
            CenterArc((FILLET3_R, -FILLET3_R), FILLET3_R, 90, 90)
            Line((0, -FILLET3_R), (0, 0))
            Line((0, 0), (FILLET3_R, 0))
        make_face()
    extrude(amount=2.5, mode=Mode.SUBTRACT)
    with BuildSketch(Plane(origin=(48, 0, -0.5), x_dir=(0, 0, -1), z_dir=(0, -1, 0))) as fillet3_piece_13:
        with BuildLine():
            CenterArc((FILLET3_R, FILLET3_R), FILLET3_R, 180, 90)
            Line((0, FILLET3_R), (0, 0))
            Line((0, 0), (FILLET3_R, 0))
        make_face()
    extrude(amount=35.75, mode=Mode.SUBTRACT)

    # Sketch36 → Cut-Extrude21 (cut)
    with BuildSketch(Plane.XY.offset(-0.5)):
        with BuildLine():
            Line((49.5, -21.500032458), (49.5, -22))
            Line((49.5, -22), (50.5, -22))
            Line((50.5, -22), (50.5, -21.5))
            ThreePointArc((50.5, -21.5), (49.999983772, -21.000032458), (49.5, -21.500032458))
        make_face()
        with BuildLine():
            Line((53.5, -22), (53.5, -21.5))
            ThreePointArc((53.5, -21.5), (53, -21), (52.5, -21.5))
            Line((52.5, -21.5), (52.5, -22))
            Line((52.5, -22), (53.5, -22))
        make_face()
        with BuildLine():
            Line((49.5, -26.500032458), (49.5, -27))
            Line((49.5, -27), (50.5, -27))
            Line((50.5, -27), (50.5, -26.5))
            ThreePointArc((50.5, -26.5), (49.999983772, -26.000032458), (49.5, -26.500032458))
        make_face()
        with BuildLine():
            Line((53.5, -27), (53.5, -26.5))
            ThreePointArc((53.5, -26.5), (53, -26), (52.5, -26.5))
            Line((52.5, -26.5), (52.5, -27))
            Line((52.5, -27), (53.5, -27))
        make_face()
    extrude(amount=-CUT_EXTRUDE21_DEPTH, mode=Mode.SUBTRACT)


solid = part.part
